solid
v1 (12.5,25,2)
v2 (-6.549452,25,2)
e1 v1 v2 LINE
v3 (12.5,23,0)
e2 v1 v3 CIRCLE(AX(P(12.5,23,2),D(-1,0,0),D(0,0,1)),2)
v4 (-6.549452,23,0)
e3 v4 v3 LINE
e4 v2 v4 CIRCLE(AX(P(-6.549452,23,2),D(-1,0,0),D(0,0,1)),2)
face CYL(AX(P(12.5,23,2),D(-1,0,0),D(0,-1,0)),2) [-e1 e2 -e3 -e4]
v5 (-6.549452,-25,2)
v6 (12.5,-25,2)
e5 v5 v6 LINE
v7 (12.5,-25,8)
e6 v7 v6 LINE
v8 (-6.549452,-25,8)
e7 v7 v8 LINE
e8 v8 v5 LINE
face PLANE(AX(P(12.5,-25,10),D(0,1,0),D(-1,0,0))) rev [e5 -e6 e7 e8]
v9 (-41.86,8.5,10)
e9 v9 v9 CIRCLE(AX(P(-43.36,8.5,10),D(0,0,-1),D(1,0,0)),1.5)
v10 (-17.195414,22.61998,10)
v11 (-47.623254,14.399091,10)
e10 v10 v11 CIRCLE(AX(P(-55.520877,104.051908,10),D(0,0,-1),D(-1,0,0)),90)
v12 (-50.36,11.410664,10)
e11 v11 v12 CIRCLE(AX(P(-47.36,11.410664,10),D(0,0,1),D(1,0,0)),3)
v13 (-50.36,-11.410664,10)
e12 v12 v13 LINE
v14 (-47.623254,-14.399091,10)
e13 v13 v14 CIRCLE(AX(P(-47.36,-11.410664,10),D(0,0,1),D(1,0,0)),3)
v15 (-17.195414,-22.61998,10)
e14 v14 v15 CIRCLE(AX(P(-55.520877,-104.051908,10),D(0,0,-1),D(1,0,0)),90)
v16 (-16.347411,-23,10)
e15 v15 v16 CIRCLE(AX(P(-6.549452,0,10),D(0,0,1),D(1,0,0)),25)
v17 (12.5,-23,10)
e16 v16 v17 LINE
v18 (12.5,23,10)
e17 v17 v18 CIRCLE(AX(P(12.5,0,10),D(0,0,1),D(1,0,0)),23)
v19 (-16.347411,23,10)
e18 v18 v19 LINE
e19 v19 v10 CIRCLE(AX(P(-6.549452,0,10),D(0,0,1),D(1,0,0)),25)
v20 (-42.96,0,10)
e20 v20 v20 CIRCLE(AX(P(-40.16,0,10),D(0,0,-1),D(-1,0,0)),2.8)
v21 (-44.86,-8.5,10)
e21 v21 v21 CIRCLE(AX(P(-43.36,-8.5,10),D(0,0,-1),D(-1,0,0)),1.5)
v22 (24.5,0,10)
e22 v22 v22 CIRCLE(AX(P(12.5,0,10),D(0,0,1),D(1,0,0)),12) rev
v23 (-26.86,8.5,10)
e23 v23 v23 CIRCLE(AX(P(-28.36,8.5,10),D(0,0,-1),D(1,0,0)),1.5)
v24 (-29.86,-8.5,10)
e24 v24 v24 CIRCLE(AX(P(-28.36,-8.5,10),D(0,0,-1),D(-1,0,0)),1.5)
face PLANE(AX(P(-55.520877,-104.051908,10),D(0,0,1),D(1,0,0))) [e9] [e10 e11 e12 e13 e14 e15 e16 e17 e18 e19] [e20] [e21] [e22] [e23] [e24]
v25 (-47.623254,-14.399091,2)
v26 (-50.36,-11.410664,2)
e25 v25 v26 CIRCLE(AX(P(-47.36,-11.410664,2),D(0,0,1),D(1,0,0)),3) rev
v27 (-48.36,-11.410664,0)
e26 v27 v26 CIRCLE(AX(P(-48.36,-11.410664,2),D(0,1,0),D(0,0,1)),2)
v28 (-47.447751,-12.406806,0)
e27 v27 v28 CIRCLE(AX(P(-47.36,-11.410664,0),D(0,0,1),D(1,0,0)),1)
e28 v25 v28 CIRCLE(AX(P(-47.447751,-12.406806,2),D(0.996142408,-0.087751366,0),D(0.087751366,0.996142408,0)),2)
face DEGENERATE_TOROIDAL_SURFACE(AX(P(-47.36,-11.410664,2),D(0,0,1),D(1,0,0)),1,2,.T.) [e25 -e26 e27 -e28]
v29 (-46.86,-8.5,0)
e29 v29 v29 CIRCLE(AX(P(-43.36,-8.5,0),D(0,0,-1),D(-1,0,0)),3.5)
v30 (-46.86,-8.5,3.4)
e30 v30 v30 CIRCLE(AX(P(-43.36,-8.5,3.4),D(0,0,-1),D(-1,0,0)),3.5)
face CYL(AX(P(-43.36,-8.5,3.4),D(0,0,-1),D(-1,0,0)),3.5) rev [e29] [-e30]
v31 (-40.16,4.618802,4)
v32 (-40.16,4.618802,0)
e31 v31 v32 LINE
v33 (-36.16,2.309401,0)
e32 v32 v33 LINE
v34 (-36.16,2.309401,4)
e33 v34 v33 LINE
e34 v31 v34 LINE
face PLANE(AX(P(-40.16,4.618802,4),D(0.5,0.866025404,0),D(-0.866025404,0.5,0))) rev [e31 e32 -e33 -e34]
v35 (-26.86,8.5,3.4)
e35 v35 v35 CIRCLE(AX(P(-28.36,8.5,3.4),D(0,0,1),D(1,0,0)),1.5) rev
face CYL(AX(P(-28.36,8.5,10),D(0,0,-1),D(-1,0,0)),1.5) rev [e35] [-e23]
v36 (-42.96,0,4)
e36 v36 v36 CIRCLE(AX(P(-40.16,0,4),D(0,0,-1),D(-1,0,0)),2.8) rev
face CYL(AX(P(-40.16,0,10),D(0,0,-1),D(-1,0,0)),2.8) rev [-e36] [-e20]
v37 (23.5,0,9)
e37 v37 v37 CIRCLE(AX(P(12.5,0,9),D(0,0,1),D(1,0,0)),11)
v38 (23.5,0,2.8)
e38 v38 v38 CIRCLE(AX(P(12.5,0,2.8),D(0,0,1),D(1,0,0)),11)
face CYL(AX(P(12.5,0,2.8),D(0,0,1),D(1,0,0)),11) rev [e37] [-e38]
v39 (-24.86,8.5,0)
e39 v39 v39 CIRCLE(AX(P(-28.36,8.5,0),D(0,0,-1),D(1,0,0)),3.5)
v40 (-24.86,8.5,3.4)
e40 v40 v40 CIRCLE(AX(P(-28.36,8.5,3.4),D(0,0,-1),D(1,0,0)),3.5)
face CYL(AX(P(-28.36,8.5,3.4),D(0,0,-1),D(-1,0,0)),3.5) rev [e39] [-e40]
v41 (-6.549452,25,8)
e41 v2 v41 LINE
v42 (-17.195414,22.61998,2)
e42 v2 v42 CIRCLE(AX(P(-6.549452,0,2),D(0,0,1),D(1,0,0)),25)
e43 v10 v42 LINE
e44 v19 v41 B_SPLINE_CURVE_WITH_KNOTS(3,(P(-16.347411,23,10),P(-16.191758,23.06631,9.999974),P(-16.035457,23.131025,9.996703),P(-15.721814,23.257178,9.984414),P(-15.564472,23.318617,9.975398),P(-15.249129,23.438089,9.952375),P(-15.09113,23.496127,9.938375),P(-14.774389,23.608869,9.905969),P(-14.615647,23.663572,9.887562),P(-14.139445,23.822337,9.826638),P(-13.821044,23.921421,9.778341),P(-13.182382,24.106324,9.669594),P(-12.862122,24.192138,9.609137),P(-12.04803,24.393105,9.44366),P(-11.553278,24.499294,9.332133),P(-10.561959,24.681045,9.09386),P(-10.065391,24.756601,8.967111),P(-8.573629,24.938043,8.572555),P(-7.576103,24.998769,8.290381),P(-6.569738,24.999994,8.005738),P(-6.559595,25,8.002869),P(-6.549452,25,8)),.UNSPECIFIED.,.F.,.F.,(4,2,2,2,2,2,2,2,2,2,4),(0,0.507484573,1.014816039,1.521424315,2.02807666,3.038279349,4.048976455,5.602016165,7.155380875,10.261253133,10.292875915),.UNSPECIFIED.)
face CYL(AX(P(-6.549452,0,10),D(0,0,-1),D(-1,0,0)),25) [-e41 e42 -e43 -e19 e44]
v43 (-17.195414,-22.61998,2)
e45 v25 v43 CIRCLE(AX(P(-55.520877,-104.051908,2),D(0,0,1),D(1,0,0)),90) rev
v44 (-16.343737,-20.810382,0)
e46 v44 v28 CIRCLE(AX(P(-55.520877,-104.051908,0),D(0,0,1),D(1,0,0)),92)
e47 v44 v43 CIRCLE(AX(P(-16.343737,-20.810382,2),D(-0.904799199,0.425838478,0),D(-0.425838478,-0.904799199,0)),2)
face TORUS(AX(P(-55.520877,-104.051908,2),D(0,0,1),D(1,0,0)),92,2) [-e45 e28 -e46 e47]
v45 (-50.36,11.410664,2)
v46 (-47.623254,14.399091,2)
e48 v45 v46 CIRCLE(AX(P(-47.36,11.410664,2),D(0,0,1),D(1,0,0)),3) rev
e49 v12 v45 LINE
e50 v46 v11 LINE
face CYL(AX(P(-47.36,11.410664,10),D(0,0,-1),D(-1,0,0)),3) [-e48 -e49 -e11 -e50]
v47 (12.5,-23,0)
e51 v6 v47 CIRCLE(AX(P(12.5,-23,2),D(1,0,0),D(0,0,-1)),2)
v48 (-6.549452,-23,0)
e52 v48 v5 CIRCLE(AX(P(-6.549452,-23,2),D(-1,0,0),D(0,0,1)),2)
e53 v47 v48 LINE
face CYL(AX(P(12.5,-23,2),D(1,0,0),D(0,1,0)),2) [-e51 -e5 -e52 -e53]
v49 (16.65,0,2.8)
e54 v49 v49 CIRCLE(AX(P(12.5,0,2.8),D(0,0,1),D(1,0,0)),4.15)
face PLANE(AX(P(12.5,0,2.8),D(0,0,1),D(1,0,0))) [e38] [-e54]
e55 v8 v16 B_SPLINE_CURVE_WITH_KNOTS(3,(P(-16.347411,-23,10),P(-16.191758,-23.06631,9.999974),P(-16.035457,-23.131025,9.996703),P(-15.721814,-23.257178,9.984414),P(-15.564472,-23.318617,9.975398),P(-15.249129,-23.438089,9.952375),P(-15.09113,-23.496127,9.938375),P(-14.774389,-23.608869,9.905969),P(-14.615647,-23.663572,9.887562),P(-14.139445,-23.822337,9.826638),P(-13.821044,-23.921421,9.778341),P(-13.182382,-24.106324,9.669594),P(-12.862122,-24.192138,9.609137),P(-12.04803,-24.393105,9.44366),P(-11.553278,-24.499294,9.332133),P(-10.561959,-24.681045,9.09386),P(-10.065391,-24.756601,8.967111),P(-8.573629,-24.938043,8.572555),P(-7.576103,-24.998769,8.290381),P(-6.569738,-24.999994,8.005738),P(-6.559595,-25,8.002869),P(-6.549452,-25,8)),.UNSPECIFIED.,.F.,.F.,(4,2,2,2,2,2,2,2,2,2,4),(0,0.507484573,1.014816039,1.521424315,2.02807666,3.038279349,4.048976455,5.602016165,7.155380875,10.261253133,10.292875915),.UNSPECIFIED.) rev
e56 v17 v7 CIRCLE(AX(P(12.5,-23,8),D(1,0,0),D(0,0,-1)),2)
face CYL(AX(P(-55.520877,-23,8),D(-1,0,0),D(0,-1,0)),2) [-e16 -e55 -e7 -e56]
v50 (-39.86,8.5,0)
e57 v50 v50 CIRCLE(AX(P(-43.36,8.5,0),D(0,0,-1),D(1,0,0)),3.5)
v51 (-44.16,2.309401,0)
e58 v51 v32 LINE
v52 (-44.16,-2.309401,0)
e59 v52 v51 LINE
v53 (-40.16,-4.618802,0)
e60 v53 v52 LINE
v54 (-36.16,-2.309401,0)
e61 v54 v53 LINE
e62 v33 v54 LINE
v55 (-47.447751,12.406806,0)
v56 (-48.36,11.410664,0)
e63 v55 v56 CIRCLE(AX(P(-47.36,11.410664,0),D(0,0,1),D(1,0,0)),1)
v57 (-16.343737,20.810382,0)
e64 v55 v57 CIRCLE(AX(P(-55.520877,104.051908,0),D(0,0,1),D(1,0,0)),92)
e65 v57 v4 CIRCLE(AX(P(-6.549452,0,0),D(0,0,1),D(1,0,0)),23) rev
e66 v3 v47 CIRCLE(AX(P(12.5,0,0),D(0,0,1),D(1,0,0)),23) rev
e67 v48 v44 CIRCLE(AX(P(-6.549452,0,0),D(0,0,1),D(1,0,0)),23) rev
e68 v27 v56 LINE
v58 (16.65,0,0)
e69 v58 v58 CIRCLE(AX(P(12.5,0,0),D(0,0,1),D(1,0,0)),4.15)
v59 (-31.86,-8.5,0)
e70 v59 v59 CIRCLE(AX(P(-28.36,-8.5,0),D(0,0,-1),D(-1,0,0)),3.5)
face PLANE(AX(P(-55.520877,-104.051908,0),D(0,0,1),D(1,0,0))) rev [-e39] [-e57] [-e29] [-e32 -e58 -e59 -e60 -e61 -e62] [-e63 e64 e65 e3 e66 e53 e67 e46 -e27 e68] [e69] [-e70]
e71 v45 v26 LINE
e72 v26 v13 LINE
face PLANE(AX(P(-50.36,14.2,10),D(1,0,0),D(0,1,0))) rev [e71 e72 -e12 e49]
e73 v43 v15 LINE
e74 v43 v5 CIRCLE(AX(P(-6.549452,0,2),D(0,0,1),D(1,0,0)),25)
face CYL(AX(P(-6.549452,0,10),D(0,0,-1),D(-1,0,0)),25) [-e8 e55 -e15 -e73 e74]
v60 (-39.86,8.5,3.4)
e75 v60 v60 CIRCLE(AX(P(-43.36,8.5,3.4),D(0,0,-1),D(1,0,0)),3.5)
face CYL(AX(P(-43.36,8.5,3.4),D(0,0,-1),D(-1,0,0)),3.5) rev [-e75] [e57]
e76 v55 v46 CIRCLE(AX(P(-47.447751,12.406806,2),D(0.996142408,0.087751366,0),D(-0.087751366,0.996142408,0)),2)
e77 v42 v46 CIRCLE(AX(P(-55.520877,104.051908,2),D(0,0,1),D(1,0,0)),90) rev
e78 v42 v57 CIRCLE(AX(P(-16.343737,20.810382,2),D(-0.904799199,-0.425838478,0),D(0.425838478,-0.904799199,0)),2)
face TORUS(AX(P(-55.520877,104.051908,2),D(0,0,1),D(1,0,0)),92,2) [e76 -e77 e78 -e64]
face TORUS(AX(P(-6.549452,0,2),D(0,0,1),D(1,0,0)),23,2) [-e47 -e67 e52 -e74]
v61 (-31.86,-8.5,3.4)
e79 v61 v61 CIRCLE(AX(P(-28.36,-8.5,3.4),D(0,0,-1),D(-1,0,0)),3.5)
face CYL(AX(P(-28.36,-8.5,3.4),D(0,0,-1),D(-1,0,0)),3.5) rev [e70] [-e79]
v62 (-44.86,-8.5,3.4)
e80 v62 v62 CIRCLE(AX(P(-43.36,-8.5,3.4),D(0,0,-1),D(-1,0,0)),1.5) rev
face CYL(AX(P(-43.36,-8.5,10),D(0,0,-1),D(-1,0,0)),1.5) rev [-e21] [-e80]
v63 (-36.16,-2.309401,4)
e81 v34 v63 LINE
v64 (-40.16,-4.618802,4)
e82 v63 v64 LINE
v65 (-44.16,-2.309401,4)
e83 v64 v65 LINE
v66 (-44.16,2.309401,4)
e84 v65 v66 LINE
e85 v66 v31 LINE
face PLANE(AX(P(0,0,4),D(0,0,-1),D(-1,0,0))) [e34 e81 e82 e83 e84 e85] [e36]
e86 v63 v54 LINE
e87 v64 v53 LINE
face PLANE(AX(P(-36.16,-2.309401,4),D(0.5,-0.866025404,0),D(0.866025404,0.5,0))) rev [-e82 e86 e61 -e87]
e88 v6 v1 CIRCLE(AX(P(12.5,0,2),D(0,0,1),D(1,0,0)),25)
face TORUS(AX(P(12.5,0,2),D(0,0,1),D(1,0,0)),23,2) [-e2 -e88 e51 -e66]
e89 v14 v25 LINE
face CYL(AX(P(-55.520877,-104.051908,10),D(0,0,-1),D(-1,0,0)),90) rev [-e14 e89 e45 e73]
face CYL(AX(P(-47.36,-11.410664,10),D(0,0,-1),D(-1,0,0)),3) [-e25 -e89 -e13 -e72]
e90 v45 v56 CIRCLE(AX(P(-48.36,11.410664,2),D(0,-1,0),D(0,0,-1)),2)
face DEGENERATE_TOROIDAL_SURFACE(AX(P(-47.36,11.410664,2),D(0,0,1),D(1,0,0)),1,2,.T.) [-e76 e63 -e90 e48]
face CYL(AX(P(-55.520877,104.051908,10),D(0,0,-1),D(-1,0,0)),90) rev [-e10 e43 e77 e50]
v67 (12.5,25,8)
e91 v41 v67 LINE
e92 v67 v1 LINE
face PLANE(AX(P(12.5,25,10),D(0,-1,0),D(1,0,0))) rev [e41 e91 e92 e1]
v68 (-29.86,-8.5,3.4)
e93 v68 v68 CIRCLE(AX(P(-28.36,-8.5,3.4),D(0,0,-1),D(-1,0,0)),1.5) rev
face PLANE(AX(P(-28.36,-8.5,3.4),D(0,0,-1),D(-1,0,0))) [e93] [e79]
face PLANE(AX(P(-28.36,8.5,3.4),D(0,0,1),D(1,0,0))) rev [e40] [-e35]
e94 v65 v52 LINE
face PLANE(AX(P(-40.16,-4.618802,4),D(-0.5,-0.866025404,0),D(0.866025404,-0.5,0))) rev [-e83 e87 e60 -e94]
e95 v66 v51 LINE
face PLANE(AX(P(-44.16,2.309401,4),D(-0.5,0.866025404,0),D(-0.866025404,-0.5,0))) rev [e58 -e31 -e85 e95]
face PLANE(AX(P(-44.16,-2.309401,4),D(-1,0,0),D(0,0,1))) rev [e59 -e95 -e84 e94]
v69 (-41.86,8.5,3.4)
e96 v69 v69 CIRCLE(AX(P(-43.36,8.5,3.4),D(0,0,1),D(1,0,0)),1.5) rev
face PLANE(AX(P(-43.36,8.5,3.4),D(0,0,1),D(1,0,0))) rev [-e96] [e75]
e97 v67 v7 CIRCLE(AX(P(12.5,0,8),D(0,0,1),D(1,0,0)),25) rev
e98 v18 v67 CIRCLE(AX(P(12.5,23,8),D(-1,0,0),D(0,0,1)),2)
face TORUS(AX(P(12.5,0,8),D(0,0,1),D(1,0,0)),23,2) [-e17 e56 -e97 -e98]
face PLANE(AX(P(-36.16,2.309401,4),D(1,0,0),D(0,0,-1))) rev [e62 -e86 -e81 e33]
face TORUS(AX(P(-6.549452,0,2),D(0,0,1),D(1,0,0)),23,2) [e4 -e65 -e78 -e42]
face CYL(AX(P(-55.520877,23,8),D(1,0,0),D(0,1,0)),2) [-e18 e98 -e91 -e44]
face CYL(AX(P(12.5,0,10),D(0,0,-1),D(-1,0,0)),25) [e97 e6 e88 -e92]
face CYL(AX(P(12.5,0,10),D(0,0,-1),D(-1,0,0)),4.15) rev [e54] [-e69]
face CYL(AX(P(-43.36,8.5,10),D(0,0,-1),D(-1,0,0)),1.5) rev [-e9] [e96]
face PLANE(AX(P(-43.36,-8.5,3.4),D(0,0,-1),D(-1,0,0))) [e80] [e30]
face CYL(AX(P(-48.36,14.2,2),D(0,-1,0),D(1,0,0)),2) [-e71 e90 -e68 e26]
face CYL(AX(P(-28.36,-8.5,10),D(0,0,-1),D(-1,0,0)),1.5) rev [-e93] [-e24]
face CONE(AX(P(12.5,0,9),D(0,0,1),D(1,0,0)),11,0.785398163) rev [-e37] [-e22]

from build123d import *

# Parameters (mm, degrees)
SKETCH1_R           = 4.15
BOSS_EXTRUDE1_DEPTH = 10
SKETCH4_R           = 11
CUT_EXTRUDE2_DEPTH  = 7.2
CHAMFER1_SIZE       = 1
FILLET2_R           = 25
FILLET3_R           = 2
FILLET4_R           = 2
FILLET5_DEPTH       = 11
FILLET5_2_ANGLE     = 84.965742
FILLET5_3_ANGLE     = 84.965742
SKETCH5_R           = 2.8
CUT_EXTRUDE3_DEPTH  = 58.10630094
CUT_EXTRUDE5_DEPTH  = 4
SKETCH8_R           = 1.5
CUT_EXTRUDE6_DEPTH  = 58.10630094
SKETCH9_R           = 3.5
CUT_EXTRUDE7_DEPTH  = 3.4


with BuildPart() as part:
    # Sketch1 → Boss-Extrude1 (new body)
    with BuildSketch(Plane.XY):
        with BuildLine():
            Line((12.5, 25), (-12.5, 25))
            ThreePointArc((-12.5, 25), (-30.832208454, 17.504408525), (-50.36, 14.2))
            Line((-50.36, 14.2), (-50.36, -14.2))
            ThreePointArc((-50.36, -14.2), (-30.832208454, -17.504408525), (-12.5, -25))
            Line((-12.5, -25), (12.5, -25))
            ThreePointArc((12.5, -25), (37.5, 0), (12.5, 25))
        make_face()
        with Locations((12.5, 0)):
            Circle(SKETCH1_R, mode=Mode.SUBTRACT)
    extrude(amount=BOSS_EXTRUDE1_DEPTH)

    # Sketch4 → Cut-Extrude2 (cut)
    with BuildSketch(Plane.XY.offset(10)):
        with Locations((12.5, 0)):
            Circle(SKETCH4_R)
    extrude(amount=-CUT_EXTRUDE2_DEPTH, mode=Mode.SUBTRACT)

    # Chamfer1
    chamfer1_edges = [part.edges().sort_by_distance(p)[0] for p in [
        (1.5, 0, 10),
    ]]
    chamfer(chamfer1_edges, length=CHAMFER1_SIZE)

    # Fillet2
    fillet2_edges = [part.edges().sort_by_distance(p)[0] for p in [
        (-12.5, 25, 5),
        (-12.5, -25, 5),
    ]]
    fillet(fillet2_edges, radius=FILLET2_R)

    # Fillet3
    fillet3_edges = [part.edges().sort_by_distance(p)[0] for p in [
        (-33.37388042, 16.819399365, 0),
        (2.975273986, -25, 0),
        (-12.003831035, -24.397740667, 0),
        (-12.003831035, 24.397740667, 0),
        (-50.36, 0, 0),
        (2.975273986, 25, 0),
        (37.5, 0, 0),
        (-33.37388042, -16.819399365, 0),
    ]]
    fillet(fillet3_edges, radius=FILLET3_R)

    # Fillet4
    # the kernel refuses this fillet: 2 mm, written as the material it takes off along each edge
    with BuildSketch(Plane(origin=(12.5, 0, 10), x_dir=(0, -1, 0), z_dir=(-1, 0, 0))) as fillet4_piece_1:
        with BuildLine():
            CenterArc((25 - FILLET4_R, -FILLET4_R), FILLET4_R, 0, 90)
            Line((25, -FILLET4_R), (25, 0))
            Line((25, 0), (25 - FILLET4_R, 0))
        make_face()
    revolve(axis=Axis((12.5, 0, 10), (0, 0, 1)), revolution_arc=180, mode=Mode.SUBTRACT)
    with BuildSketch(Plane(origin=(12.5, 25, 10), x_dir=(0, -1, 0), z_dir=(-1, 0, 0))) as fillet4_piece_2:
        with BuildLine():
            CenterArc((FILLET4_R, -FILLET4_R), FILLET4_R, 90, 90)
            Line((0, -FILLET4_R), (0, 0))
            Line((0, 0), (FILLET4_R, 0))
        make_face()
    extrude(amount=34.049452029, mode=Mode.SUBTRACT)
    with BuildSketch(Plane(origin=(-21.549452029, -25, 10), x_dir=(0, 0, -1), z_dir=(1, 0, 0))) as fillet4_piece_3:
        with BuildLine():
            CenterArc((FILLET4_R, FILLET4_R), FILLET4_R, 180, 90)
            Line((0, FILLET4_R), (0, 0))
            Line((0, 0), (FILLET4_R, 0))
        make_face()
    extrude(amount=34.049452029, mode=Mode.SUBTRACT)

    # Fillet5: read off the stored shape, not the designer's step
    # Fillet5 outline → Fillet5 (cut)
    with BuildSketch(Plane.XY):
        with BuildLine():
            Line((-50.36, 14.2), (-50.36, 11.410663893))
            ThreePointArc((-50.36, 11.410663893), (-49.572437829, 13.436773182), (-47.623254098, 14.399091118))
            ThreePointArc((-47.623254098, 14.399091118), (-48.990868253, 14.289114994), (-50.36, 14.2))
        make_face()
        with BuildLine():
            ThreePointArc((-47.623254098, -14.399091118), (-49.572437829, -13.436773182), (-50.36, -11.410663893))
            Line((-50.36, -11.410663893), (-50.36, -14.2))
            ThreePointArc((-50.36, -14.2), (-48.990868253, -14.289114994), (-47.623254098, -14.399091118))
        make_face()
    extrude(amount=FILLET5_DEPTH, mode=Mode.SUBTRACT)

    # Fillet5 2 outline → Fillet5 2 (revolve, cut)
    with BuildSketch(Plane(origin=(-47.36, 11.410663893, 0), x_dir=(-0.08775136609960318, 0.9961424083672241, 0), z_dir=(0.9961424083672241, 0.08775136609960318, 0))):
        with BuildLine():
            ThreePointArc((3, 2), (2.414213562, 0.585786438), (1, 0))
            Line((1, 0), (3, 0))
            Line((3, 0), (3, 2))
        make_face()
    revolve(axis=Axis((-47.36, 11.410663893, 0), (0, 0, 1)), revolution_arc=FILLET5_2_ANGLE, mode=Mode.SUBTRACT)

    # Fillet5 3 outline → Fillet5 3 (revolve, cut)
    with BuildSketch(Plane(origin=(-47.36, -11.410663893, 0), x_dir=(-1, 0, 0), z_dir=(0, 1, 0))):
        with BuildLine():
            ThreePointArc((3, 2), (2.414213562, 0.585786438), (1, 0))
            Line((1, 0), (3, 0))
            Line((3, 0), (3, 2))
        make_face()
    revolve(axis=Axis((-47.36, -11.410663893, 0), (0, 0, 1)), revolution_arc=FILLET5_3_ANGLE, mode=Mode.SUBTRACT)

    # Sketch5 → Cut-Extrude3 (cut, through all)
    with BuildSketch(Plane(origin=(0, 0, 0), x_dir=(-1, 0, 0), z_dir=(0, 0, -1))):
        with Locations((40.16, 0)):
            Circle(SKETCH5_R)
    extrude(amount=-CUT_EXTRUDE3_DEPTH, mode=Mode.SUBTRACT)

    # Sketch7 → Cut-Extrude5 (cut)
    with BuildSketch(Plane(origin=(0, 0, 0), x_dir=(-1, 0, 0), z_dir=(0, 0, -1))):
        Polygon((36.16, -2.309401077), (40.16, -4.618802154), (44.16, -2.309401077), (44.16, 2.309401077), (40.16, 4.618802154), (36.16, 2.309401077), align=None)
    extrude(amount=-CUT_EXTRUDE5_DEPTH, mode=Mode.SUBTRACT)

    # Sketch8 → Cut-Extrude6 (cut, through all)
    with BuildSketch(Plane(origin=(0, 0, 0), x_dir=(-1, 0, 0), z_dir=(0, 0, -1))):
        with Locations((43.36, -8.5)):
            Circle(SKETCH8_R)
        with Locations((28.36, -8.5)):
            Circle(SKETCH8_R)
        with Locations(Location((28.36, 8.5, 0), (0, 0, 180))):
            Circle(SKETCH8_R)
        with Locations(Location((43.36, 8.5, 0), (0, 0, 180))):
            Circle(SKETCH8_R)
    extrude(amount=-CUT_EXTRUDE6_DEPTH, mode=Mode.SUBTRACT)

    # Sketch9 → Cut-Extrude7 (cut)
    with BuildSketch(Plane(origin=(0, 0, 0), x_dir=(-1, 0, 0), z_dir=(0, 0, -1))):
        with Locations((43.36, -8.5)):
            Circle(SKETCH9_R)
        with Locations((28.36, -8.5)):
            Circle(SKETCH9_R)
        with Locations(Location((28.36, 8.5, 0), (0, 0, 180))):
            Circle(SKETCH9_R)
        with Locations(Location((43.36, 8.5, 0), (0, 0, 180))):
            Circle(SKETCH9_R)
    extrude(amount=-CUT_EXTRUDE7_DEPTH, mode=Mode.SUBTRACT)


solid = part.part
